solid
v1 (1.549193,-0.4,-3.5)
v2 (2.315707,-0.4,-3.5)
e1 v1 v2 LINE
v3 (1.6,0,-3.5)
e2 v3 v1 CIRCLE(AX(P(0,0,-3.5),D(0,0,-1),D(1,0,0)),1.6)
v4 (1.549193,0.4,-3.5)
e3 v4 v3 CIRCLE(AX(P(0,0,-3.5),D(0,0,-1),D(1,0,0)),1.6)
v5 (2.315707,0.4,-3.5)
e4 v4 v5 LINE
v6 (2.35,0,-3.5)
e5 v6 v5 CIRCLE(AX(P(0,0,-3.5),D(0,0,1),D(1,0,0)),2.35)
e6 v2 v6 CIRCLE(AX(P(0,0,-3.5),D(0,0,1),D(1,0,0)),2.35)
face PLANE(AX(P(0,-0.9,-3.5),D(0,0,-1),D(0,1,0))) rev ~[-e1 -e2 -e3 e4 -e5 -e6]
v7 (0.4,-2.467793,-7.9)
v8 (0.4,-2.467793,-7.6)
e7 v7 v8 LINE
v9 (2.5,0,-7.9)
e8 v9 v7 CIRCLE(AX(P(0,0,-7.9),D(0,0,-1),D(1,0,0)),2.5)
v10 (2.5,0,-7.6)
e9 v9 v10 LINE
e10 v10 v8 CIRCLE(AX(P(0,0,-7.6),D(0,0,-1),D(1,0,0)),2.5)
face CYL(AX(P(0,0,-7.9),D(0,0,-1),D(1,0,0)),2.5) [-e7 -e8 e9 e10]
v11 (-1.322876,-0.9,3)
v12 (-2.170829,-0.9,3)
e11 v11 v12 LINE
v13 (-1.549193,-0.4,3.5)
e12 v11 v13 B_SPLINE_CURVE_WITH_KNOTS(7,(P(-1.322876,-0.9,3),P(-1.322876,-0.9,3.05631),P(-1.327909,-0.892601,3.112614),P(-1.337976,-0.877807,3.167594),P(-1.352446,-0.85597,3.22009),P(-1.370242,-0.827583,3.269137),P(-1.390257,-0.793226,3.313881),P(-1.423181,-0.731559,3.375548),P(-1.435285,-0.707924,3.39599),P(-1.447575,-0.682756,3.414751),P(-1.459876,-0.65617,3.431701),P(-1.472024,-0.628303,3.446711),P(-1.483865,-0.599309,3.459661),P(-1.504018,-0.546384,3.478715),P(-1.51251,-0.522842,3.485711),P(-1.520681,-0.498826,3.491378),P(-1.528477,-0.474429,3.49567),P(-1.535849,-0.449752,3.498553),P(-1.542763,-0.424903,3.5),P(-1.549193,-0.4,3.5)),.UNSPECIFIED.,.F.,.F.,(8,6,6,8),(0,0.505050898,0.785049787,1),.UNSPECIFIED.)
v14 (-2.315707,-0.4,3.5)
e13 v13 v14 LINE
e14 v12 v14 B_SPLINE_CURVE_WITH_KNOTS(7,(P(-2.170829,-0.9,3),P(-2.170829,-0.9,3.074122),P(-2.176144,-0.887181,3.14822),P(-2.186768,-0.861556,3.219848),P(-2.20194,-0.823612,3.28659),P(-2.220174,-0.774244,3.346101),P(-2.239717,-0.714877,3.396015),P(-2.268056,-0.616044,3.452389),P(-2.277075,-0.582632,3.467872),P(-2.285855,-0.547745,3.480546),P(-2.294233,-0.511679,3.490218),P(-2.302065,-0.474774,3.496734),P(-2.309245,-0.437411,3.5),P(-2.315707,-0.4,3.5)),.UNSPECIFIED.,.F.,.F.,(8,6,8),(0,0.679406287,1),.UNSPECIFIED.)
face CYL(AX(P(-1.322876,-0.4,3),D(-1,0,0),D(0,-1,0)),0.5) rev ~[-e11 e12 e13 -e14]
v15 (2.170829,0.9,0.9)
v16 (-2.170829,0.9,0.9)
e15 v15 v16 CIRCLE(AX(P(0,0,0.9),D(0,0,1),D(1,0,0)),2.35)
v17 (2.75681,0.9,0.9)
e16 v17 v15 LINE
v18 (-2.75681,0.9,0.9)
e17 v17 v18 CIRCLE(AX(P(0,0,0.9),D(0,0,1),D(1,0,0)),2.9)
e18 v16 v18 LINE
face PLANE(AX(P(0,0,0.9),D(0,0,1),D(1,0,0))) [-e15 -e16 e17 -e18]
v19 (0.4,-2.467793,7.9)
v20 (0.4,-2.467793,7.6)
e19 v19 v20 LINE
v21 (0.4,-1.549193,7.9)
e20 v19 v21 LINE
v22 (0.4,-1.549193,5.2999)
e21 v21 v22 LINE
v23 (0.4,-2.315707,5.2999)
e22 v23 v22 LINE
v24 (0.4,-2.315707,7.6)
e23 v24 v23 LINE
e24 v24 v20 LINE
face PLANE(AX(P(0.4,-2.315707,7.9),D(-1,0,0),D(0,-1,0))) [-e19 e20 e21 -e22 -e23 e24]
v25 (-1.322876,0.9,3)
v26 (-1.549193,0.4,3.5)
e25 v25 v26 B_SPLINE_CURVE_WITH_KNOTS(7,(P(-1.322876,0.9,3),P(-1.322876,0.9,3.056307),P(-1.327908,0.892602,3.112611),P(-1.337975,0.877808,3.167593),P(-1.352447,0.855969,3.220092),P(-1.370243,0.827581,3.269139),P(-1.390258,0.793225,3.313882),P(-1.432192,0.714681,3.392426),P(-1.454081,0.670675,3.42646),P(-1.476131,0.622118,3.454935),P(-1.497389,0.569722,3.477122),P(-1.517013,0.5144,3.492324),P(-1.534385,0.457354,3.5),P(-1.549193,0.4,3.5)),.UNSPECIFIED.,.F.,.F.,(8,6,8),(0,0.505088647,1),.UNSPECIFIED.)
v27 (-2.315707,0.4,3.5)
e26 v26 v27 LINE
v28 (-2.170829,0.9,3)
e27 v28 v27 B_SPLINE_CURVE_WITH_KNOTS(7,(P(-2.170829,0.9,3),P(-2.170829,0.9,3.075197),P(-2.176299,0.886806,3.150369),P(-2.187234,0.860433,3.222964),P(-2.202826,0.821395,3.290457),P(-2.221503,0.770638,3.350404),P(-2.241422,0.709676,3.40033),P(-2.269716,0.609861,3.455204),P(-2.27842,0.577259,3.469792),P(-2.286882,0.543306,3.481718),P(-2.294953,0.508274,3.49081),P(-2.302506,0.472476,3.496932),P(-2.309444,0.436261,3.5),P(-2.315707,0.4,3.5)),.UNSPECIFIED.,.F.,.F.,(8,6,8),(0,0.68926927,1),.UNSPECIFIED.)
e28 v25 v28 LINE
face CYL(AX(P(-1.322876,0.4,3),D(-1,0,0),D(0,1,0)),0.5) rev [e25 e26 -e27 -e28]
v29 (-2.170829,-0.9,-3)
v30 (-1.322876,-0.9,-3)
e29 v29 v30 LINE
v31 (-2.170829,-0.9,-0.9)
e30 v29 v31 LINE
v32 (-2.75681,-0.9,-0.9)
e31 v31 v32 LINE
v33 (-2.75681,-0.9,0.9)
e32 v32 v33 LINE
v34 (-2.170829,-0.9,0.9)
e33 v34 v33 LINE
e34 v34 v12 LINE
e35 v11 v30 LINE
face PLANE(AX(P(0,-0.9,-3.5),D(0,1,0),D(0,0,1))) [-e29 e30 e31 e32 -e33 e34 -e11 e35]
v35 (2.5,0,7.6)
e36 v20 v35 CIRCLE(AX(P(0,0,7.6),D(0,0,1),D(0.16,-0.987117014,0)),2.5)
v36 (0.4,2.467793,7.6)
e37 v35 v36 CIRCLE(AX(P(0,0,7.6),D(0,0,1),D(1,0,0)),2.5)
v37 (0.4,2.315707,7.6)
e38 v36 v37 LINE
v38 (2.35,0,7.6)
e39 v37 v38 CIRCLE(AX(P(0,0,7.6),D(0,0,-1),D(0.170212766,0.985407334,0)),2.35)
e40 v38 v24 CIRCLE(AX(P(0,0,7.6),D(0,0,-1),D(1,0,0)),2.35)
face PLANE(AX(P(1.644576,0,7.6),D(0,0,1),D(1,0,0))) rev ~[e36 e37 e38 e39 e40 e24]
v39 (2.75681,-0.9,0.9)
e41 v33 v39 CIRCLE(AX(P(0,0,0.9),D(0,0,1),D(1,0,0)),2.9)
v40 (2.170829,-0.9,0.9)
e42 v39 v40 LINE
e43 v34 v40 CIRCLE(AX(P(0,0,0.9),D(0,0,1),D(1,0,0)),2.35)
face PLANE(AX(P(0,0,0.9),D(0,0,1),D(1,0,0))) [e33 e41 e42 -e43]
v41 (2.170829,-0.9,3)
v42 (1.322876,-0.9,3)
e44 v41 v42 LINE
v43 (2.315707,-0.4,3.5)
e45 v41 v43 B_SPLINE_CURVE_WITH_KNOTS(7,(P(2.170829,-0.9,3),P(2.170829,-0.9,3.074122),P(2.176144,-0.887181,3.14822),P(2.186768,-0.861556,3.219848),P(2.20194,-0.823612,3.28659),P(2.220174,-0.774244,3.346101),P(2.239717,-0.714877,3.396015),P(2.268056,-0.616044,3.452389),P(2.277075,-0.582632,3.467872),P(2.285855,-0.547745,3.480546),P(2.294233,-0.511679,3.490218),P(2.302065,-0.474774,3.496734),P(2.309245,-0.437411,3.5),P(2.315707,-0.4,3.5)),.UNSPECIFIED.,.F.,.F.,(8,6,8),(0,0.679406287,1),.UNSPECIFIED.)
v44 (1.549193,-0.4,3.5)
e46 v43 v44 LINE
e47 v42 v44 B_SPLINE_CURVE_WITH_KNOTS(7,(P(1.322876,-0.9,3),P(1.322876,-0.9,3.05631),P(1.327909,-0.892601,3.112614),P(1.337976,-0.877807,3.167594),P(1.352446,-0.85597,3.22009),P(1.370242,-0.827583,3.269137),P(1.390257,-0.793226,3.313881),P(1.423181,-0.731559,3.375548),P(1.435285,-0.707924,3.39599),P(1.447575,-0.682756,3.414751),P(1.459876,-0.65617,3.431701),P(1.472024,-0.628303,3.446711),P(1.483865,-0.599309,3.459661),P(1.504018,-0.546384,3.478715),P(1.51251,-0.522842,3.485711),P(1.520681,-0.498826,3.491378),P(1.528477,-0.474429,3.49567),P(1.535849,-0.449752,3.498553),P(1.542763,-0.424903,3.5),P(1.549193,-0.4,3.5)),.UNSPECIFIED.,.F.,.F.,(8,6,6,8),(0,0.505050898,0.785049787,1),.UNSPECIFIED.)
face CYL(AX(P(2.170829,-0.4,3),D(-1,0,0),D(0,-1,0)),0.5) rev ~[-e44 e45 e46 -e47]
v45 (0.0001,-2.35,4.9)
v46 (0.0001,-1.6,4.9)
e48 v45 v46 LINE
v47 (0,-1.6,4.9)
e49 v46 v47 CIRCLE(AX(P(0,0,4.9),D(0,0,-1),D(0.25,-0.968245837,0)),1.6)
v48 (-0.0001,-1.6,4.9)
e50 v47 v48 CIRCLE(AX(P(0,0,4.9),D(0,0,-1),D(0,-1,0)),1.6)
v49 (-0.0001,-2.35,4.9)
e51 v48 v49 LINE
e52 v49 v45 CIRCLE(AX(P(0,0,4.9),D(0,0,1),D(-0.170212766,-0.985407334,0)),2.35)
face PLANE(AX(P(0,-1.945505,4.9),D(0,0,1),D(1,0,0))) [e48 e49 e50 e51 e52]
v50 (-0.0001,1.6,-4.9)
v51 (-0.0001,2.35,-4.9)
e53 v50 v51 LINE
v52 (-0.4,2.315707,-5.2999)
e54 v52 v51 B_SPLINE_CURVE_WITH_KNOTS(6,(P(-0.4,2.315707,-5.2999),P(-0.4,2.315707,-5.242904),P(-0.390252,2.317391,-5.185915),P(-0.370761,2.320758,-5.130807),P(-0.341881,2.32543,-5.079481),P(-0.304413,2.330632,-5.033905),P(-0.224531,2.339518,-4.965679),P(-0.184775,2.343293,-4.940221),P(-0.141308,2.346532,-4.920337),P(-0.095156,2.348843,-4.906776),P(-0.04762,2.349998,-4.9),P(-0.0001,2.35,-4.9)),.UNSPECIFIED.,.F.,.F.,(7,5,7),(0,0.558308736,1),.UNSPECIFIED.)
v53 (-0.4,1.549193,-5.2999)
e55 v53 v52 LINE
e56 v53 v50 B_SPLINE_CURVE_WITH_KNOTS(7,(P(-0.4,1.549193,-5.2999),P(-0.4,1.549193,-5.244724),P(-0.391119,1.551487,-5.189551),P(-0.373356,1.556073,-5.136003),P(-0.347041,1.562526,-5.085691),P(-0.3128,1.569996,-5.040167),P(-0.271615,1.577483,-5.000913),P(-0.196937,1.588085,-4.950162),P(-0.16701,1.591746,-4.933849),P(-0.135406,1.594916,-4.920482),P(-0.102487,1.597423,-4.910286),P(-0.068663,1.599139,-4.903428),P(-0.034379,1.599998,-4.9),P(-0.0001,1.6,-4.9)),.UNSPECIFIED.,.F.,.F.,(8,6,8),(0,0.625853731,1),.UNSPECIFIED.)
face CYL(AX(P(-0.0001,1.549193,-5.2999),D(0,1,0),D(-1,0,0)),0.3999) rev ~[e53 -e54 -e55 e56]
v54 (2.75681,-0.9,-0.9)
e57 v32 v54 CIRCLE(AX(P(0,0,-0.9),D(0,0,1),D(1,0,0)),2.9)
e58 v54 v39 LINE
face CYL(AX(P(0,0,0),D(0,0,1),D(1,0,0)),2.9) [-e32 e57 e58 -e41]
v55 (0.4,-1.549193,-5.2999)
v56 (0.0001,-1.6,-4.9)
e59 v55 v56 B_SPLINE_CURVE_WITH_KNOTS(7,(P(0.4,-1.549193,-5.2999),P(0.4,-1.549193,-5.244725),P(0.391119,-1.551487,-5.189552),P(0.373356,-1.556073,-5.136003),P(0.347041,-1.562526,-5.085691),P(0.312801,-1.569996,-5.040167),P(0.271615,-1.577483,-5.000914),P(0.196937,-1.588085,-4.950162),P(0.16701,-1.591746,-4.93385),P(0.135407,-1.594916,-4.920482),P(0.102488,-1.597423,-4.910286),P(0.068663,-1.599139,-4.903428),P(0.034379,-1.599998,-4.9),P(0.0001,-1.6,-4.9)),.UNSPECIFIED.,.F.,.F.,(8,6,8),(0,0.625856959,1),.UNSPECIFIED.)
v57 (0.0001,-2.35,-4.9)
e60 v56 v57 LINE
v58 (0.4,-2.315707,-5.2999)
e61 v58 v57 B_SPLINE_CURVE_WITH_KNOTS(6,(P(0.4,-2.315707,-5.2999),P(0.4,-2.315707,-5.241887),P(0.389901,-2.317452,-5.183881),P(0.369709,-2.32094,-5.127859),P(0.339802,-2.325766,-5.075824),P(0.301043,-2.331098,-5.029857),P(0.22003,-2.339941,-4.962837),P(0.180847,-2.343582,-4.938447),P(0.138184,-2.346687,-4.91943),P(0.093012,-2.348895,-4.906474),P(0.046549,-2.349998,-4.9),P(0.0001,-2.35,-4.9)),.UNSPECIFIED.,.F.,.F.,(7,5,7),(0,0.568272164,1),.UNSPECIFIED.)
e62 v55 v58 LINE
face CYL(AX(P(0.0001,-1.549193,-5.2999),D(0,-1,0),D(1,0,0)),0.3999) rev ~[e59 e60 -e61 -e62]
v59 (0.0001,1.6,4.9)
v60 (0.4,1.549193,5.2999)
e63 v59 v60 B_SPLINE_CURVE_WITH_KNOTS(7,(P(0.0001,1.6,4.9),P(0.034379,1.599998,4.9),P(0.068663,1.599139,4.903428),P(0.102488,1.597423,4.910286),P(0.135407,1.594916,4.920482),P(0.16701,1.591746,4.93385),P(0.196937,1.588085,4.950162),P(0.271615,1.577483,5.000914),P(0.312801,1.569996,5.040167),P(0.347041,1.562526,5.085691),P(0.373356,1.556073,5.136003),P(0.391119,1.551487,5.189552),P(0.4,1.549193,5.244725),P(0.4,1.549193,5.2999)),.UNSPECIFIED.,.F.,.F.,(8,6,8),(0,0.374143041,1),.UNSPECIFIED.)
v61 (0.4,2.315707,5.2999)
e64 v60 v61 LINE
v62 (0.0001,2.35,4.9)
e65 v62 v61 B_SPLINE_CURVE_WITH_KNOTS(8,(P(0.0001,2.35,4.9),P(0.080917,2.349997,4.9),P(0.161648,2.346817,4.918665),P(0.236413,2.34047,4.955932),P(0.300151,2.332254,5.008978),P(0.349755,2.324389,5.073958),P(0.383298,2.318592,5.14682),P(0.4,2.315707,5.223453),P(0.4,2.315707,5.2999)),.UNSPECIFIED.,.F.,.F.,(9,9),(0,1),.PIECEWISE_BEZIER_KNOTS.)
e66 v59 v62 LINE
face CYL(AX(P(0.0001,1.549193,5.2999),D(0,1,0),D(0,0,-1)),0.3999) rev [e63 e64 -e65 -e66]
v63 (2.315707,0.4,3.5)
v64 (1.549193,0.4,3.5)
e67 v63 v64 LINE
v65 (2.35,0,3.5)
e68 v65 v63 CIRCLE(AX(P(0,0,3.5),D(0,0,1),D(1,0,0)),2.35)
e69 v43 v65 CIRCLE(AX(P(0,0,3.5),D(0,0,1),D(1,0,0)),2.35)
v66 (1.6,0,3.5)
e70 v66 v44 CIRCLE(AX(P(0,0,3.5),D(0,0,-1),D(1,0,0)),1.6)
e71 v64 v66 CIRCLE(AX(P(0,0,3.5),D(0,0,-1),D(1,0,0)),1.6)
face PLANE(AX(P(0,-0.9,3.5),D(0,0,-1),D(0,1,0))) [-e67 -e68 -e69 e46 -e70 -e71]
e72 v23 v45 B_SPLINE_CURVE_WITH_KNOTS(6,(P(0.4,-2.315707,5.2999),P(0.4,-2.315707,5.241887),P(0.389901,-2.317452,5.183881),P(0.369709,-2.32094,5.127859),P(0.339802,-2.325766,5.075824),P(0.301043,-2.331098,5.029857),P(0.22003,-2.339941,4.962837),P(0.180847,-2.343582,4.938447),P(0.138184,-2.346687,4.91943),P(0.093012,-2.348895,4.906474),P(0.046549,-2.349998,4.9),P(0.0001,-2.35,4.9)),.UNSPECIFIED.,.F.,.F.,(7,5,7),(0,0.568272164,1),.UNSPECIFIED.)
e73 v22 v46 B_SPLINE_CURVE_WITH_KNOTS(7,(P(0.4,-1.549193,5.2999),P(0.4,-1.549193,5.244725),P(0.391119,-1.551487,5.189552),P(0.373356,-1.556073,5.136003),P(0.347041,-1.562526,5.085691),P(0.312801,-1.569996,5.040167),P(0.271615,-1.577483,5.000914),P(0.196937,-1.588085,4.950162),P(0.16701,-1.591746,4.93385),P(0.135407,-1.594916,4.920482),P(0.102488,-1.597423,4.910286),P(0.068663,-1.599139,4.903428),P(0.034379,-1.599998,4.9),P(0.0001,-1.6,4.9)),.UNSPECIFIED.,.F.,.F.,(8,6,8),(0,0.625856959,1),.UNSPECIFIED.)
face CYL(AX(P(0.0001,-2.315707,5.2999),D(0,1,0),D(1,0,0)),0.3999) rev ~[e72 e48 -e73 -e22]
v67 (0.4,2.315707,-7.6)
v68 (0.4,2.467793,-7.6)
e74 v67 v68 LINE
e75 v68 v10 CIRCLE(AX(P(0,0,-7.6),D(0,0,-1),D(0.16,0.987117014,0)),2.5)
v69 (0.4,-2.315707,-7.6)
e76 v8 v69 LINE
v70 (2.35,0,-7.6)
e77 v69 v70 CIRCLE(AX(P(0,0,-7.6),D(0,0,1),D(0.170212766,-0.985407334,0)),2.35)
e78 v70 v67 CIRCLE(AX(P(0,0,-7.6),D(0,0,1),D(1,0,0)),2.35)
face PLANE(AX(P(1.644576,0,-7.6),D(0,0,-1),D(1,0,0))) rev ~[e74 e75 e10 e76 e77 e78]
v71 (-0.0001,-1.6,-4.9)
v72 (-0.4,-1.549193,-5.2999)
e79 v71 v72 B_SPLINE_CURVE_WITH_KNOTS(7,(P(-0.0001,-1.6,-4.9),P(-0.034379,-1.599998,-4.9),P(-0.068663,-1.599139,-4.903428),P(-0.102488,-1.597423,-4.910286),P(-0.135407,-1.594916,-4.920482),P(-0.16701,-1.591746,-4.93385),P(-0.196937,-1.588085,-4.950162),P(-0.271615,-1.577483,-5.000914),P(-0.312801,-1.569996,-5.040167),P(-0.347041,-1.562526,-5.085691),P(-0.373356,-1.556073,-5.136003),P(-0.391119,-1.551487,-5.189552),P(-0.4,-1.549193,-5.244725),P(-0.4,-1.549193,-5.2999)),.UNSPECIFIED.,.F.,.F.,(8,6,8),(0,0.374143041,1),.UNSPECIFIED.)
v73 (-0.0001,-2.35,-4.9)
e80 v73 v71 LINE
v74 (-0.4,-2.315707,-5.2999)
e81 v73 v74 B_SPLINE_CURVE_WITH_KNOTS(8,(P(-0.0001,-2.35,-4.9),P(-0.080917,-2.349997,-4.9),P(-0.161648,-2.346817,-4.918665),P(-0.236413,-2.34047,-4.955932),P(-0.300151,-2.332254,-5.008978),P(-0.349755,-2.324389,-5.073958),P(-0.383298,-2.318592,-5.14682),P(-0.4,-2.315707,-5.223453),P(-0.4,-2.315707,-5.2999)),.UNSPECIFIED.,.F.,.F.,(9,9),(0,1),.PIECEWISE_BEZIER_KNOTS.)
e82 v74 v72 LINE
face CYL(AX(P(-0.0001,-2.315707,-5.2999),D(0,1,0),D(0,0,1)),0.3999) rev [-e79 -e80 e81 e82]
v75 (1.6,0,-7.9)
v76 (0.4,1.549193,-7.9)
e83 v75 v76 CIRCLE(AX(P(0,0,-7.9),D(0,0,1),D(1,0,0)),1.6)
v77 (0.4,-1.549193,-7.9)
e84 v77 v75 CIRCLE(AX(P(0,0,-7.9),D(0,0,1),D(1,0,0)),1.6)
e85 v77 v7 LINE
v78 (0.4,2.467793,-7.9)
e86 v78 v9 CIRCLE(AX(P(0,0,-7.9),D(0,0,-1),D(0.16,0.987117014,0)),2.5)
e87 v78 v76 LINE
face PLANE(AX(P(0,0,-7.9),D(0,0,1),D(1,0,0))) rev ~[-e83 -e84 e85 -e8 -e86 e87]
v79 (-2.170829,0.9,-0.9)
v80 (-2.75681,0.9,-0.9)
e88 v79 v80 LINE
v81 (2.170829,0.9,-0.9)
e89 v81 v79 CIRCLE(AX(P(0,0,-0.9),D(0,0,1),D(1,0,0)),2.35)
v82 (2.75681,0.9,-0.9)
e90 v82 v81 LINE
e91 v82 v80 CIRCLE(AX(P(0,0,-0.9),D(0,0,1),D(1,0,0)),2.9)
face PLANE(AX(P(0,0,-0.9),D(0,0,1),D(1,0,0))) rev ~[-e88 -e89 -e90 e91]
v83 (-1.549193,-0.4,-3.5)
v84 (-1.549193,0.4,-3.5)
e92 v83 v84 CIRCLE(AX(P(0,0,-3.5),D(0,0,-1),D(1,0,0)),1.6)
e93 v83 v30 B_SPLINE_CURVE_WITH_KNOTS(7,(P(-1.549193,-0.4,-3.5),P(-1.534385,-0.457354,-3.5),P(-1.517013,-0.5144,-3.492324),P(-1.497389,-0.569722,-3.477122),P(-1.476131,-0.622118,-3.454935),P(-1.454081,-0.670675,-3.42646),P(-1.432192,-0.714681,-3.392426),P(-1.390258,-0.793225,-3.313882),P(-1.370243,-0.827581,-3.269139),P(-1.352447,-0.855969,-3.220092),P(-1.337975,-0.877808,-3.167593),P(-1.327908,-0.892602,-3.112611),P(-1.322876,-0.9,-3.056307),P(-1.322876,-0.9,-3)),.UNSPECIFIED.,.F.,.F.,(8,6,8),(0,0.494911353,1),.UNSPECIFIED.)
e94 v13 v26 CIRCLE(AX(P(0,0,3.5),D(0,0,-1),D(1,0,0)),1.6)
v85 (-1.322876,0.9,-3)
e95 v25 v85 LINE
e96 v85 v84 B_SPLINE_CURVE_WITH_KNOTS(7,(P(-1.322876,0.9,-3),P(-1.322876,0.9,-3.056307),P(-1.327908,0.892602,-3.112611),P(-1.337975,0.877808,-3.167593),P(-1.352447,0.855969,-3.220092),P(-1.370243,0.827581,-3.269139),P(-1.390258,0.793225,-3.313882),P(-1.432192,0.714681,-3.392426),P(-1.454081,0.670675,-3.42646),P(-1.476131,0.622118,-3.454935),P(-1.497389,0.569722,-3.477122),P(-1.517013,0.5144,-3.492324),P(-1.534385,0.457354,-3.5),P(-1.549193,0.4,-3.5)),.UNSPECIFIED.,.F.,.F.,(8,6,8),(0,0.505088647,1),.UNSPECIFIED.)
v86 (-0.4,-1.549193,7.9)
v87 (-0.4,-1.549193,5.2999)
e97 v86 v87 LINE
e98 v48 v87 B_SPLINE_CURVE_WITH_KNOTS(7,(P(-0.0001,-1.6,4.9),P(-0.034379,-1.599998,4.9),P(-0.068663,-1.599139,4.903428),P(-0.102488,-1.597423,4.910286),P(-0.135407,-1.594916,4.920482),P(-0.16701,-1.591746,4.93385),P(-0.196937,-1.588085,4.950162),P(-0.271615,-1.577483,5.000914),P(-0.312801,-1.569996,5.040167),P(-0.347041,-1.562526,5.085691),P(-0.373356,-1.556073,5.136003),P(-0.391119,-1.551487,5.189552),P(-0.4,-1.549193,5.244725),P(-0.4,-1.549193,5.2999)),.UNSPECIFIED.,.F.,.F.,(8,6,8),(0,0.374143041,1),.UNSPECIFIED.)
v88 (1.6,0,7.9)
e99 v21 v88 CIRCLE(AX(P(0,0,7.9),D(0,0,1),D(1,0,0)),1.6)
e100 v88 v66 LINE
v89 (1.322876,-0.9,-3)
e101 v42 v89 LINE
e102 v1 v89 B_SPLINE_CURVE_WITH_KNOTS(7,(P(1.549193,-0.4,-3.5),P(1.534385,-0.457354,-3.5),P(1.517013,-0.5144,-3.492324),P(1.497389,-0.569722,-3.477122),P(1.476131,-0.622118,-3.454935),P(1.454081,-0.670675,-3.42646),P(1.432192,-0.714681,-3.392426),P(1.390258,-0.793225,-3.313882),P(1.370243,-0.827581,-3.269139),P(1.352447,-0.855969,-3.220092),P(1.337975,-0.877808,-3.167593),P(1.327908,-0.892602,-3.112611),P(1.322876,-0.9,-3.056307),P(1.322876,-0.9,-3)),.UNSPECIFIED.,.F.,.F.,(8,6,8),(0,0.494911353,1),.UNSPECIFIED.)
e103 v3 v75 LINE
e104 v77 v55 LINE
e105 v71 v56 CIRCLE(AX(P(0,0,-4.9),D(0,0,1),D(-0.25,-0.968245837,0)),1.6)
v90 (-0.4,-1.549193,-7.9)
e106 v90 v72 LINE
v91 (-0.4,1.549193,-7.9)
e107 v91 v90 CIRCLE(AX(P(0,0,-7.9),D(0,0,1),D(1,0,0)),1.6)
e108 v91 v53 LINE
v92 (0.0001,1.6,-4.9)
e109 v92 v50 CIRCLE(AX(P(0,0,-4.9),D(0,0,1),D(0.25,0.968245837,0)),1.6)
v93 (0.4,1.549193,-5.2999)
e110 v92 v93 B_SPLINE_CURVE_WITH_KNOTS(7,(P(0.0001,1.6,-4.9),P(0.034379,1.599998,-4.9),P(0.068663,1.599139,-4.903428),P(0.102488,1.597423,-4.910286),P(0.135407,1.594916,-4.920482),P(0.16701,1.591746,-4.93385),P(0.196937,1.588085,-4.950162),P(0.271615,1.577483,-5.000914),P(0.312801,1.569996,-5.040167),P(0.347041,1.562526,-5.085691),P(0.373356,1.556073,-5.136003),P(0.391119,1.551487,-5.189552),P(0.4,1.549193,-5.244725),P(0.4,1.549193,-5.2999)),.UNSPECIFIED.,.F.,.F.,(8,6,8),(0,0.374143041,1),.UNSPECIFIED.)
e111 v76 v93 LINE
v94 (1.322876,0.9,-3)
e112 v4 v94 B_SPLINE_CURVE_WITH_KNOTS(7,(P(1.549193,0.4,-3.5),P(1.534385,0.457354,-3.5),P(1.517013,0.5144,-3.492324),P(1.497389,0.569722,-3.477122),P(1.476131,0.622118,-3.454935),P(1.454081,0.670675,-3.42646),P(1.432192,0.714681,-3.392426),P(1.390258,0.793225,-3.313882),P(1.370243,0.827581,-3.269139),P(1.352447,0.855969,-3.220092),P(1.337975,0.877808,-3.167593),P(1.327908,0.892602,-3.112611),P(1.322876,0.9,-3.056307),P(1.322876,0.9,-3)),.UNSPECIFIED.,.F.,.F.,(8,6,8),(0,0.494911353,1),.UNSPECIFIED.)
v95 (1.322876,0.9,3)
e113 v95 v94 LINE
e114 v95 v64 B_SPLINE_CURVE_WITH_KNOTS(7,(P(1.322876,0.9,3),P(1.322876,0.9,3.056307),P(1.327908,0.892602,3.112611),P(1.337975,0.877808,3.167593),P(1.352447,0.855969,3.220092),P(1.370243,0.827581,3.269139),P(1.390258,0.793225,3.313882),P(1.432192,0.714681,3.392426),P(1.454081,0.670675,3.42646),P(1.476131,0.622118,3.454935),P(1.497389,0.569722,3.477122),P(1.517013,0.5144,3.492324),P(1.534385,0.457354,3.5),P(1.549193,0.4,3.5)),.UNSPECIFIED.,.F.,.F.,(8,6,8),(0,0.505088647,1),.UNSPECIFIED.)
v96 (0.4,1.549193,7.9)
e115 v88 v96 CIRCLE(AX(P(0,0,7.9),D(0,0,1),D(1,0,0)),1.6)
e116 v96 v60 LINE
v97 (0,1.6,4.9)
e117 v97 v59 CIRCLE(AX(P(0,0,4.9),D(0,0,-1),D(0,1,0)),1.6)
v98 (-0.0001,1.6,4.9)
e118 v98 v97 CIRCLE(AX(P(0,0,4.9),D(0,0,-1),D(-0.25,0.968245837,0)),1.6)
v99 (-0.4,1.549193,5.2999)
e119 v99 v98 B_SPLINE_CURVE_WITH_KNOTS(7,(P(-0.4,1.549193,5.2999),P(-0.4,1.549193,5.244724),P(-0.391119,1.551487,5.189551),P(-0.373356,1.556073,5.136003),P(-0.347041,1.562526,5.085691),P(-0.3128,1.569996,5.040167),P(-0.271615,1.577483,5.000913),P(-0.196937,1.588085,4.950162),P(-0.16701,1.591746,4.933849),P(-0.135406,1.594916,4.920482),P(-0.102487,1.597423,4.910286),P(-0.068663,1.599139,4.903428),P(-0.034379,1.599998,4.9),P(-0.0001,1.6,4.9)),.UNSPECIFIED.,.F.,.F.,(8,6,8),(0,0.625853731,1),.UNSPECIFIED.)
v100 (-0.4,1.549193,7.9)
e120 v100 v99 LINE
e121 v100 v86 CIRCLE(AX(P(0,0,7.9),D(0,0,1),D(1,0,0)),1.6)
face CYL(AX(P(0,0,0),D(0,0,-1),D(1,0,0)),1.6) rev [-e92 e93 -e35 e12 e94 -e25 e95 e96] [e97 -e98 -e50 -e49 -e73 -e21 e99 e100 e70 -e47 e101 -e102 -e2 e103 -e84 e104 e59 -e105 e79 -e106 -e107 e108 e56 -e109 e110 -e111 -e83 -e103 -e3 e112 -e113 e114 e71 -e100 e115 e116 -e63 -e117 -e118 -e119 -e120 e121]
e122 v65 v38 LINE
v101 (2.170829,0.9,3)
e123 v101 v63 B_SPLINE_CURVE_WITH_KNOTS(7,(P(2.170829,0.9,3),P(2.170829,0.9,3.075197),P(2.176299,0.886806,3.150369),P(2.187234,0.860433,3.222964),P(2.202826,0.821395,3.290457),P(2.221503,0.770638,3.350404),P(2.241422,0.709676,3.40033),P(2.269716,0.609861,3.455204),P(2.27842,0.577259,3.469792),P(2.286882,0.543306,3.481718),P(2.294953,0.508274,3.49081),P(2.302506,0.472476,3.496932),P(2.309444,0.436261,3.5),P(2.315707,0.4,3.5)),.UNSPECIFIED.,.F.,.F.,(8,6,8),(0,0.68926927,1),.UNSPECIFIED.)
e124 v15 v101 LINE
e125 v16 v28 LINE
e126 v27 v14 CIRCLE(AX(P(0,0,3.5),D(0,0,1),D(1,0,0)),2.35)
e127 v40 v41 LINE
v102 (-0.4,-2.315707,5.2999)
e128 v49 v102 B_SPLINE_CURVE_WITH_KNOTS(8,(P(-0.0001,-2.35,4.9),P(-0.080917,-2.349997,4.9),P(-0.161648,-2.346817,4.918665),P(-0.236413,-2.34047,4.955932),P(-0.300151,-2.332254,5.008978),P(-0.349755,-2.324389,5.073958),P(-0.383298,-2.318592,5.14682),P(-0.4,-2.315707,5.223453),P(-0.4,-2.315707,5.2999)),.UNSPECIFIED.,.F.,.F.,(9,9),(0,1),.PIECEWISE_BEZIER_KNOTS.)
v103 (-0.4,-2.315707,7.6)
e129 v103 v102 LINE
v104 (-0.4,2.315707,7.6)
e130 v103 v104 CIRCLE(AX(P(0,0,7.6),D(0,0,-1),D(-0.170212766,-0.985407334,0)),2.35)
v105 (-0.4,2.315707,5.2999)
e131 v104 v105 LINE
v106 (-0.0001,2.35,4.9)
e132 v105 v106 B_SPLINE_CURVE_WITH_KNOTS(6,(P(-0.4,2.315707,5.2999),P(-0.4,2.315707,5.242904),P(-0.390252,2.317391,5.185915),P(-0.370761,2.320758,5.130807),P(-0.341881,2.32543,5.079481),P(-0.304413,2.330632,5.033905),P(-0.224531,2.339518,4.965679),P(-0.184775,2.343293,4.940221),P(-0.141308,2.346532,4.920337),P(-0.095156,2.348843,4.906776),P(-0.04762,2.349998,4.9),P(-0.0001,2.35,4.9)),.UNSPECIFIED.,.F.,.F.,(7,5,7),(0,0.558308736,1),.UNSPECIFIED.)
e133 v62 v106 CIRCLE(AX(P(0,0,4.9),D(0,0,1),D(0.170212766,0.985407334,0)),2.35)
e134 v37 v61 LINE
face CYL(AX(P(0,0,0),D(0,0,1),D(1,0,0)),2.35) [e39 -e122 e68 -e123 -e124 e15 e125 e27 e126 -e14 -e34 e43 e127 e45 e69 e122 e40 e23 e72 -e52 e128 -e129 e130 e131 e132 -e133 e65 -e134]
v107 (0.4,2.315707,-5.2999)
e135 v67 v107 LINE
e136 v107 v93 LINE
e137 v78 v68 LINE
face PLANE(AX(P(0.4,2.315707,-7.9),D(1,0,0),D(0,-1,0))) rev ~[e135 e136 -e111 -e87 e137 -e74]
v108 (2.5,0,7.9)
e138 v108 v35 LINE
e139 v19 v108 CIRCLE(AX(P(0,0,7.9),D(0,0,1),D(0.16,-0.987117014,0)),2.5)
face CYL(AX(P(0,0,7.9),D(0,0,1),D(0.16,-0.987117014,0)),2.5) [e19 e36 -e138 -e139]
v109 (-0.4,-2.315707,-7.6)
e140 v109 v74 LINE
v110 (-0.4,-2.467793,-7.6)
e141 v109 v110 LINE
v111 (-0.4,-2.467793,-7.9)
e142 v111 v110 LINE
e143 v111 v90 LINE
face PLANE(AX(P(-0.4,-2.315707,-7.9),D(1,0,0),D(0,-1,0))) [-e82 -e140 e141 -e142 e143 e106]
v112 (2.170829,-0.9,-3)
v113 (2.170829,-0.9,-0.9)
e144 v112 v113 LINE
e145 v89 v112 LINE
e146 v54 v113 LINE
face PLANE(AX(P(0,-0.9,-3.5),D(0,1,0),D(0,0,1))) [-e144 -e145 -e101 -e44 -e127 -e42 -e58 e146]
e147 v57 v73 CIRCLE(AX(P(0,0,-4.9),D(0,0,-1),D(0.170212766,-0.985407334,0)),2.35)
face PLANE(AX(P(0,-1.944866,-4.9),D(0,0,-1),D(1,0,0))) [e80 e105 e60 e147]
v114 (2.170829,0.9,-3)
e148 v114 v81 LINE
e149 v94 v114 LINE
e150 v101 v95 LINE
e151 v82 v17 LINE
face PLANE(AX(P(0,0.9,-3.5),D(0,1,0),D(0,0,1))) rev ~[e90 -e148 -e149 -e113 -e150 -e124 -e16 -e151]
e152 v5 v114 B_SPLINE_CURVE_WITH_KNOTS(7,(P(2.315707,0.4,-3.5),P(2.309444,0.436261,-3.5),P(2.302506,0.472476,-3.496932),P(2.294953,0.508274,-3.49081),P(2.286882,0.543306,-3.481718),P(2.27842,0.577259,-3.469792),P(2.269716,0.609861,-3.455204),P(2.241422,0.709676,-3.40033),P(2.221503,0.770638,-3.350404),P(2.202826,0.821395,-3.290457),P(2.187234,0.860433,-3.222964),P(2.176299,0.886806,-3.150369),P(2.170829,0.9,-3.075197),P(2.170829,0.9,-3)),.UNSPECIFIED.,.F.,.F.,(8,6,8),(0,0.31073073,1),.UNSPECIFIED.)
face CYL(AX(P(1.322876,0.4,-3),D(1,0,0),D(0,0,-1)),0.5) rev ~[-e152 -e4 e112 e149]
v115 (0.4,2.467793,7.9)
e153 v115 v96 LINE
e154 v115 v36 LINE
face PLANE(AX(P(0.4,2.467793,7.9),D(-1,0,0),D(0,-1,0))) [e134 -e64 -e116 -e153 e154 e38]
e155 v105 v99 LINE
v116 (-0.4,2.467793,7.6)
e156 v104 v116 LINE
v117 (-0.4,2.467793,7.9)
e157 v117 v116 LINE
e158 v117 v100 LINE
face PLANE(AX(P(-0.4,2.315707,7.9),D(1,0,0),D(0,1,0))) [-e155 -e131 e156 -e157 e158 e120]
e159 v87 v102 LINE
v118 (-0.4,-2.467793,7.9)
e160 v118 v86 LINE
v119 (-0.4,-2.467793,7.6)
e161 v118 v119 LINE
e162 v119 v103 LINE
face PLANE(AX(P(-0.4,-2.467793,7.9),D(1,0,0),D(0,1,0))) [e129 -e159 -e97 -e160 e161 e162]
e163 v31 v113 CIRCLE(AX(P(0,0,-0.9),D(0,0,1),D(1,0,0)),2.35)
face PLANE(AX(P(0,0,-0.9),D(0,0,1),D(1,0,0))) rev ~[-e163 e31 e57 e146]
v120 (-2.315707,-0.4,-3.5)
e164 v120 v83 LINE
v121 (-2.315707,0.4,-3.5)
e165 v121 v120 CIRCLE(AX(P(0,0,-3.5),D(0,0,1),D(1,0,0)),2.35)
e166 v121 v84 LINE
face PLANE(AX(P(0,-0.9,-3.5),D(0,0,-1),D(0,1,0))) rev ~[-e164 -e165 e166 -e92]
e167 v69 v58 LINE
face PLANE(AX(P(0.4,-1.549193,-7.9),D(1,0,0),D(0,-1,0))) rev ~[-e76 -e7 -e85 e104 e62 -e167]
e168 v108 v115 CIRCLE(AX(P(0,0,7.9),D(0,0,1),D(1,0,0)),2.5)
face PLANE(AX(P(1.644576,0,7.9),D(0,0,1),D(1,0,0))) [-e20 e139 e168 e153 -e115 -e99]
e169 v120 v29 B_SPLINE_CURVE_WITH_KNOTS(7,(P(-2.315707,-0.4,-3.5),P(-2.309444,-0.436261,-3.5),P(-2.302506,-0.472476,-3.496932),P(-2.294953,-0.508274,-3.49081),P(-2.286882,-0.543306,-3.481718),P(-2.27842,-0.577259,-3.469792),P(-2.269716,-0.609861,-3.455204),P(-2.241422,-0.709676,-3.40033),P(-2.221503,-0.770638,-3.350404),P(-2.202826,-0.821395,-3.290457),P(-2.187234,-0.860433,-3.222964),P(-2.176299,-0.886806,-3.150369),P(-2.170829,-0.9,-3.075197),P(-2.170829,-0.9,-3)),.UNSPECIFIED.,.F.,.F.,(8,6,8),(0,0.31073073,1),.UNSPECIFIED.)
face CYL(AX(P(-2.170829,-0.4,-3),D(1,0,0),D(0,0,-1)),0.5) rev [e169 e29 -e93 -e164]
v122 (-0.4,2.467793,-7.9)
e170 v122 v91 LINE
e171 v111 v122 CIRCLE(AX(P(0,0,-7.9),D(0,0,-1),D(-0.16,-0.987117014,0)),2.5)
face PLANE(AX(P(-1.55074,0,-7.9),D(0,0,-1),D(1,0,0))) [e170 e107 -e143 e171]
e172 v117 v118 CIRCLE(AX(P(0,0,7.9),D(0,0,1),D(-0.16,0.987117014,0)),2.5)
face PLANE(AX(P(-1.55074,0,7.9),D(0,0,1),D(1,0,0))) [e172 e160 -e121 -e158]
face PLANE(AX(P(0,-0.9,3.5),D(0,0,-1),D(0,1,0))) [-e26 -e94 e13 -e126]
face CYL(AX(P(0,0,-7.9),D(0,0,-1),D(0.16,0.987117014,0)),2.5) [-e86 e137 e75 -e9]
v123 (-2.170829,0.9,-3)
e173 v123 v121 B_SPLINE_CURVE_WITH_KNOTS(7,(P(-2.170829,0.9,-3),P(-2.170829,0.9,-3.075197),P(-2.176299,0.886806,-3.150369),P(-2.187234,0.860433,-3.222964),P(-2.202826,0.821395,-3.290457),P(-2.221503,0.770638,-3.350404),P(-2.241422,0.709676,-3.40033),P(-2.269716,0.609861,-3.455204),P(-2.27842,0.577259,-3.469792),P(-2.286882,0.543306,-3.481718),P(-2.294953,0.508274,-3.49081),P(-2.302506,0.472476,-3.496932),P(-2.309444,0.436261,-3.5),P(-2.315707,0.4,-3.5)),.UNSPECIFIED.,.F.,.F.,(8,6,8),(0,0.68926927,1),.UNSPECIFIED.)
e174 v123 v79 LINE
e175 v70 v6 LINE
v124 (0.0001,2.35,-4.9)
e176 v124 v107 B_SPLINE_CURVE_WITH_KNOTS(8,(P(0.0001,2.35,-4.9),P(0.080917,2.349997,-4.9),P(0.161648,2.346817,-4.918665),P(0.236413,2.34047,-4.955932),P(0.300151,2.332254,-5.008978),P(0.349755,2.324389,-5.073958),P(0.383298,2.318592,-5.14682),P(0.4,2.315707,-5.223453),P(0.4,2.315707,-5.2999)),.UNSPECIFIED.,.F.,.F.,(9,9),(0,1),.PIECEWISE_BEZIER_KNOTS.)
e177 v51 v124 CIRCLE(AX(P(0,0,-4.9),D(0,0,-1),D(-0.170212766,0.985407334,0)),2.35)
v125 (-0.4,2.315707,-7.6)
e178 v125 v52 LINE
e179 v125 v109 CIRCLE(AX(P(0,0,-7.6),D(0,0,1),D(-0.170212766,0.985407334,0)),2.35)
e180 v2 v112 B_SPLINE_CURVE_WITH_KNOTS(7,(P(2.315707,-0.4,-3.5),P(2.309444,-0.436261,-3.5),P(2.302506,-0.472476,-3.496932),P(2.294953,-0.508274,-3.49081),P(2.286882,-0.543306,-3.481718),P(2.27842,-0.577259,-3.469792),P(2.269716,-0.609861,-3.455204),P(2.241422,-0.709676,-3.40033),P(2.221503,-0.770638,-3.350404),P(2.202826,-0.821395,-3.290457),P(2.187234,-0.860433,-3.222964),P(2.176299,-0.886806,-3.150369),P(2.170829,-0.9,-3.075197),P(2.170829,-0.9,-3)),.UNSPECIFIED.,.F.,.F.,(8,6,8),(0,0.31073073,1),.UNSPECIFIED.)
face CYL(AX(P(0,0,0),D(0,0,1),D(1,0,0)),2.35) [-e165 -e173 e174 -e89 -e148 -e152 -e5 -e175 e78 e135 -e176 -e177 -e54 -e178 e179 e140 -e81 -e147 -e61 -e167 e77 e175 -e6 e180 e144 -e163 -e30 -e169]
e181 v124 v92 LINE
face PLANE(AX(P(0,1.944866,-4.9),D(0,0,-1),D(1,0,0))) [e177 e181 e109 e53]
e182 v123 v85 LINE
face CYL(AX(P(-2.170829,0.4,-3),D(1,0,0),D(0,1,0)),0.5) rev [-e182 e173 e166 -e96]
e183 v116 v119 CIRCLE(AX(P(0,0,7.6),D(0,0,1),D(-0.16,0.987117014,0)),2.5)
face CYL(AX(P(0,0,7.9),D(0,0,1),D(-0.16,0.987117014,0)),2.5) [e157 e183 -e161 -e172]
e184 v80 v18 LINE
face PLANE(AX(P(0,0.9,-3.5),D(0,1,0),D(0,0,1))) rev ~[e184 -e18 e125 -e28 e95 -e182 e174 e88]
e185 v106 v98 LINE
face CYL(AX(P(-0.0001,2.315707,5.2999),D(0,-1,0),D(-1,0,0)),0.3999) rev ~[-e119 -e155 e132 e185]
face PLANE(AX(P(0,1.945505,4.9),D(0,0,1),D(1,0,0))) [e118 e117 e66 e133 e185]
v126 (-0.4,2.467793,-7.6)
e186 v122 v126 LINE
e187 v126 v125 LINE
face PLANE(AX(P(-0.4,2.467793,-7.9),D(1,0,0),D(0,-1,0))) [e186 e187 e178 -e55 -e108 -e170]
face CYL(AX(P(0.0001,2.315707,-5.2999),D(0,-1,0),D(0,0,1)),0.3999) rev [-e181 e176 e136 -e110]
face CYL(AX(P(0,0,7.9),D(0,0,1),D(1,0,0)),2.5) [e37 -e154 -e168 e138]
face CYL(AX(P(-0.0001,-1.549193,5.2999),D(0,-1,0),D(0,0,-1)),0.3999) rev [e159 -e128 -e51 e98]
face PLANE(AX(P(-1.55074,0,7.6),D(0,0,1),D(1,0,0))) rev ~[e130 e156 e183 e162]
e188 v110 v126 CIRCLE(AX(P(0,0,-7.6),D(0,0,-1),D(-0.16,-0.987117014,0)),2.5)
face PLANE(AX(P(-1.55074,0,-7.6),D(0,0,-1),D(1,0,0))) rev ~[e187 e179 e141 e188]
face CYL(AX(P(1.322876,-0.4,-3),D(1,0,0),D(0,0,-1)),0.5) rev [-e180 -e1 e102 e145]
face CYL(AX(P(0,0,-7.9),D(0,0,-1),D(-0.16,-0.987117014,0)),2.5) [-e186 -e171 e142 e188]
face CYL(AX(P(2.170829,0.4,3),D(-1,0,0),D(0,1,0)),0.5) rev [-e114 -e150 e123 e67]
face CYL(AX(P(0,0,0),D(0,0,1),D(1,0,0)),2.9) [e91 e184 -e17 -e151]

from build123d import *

# Parameters (mm, degrees)
F0_R      = 2.35
F0_R_2    = 1.6
F1_DEPTH  = 7.9
F3_DEPTH  = 3
F0_R_3    = 2.9
F4_DEPTH  = 0.9
F5_W      = 1.8
F5_H      = 7
F6_DEPTH  = 12.5
F7_R      = 0.5
F9_DEPTH  = 3
F10_R     = 0.3999
F12_DEPTH = 0.3
F14_DEPTH = 0.3
F16_DEPTH = 0.3


# Not quite as in the source:
# - a fillet or chamfer is up to 0.001 mm smaller than in the source, because OpenCascade refuses the exact size


with BuildPart() as f1:
    # F0 (on Top) → F1 (new body, symmetric)
    with BuildSketch(Plane.XY):
        Circle(F0_R)
        Circle(F0_R_2, mode=Mode.SUBTRACT)
    extrude(amount=F1_DEPTH, both=True)

    # F2 (on face) → F3 (cut)
    with BuildSketch(Plane.XY.offset(7.9)):
        with BuildLine():
            ThreePointArc((-0.4, 1.5491933385), (-0.201606868, 1.587247514), (0, 1.6))
            ThreePointArc((0, 1.6), (0.201606868, 1.587247514), (0.4, 1.5491933385))
            Line((0.4, 1.5491933385), (0.4, 1.6))
            Line((0.4, 1.6), (0.4, 2.3157072354))
            ThreePointArc((0.4, 2.3157072354), (0, 2.35), (-0.4, 2.3157072354))
            Line((-0.4, 2.3157072354), (-0.4, 1.6))
            Line((-0.4, 1.6), (-0.4, 1.5491933385))
        make_face()
        with BuildLine():
            ThreePointArc((0.4, -1.5491933385), (0.201606868, -1.587247514), (0, -1.6))
            ThreePointArc((0, -1.6), (-0.201606868, -1.587247514), (-0.4, -1.5491933385))
            Line((-0.4, -1.5491933385), (-0.4, -1.6))
            Line((-0.4, -1.6), (-0.4, -2.3157072354))
            ThreePointArc((-0.4, -2.3157072354), (0, -2.35), (0.4, -2.3157072354))
            Line((0.4, -2.3157072354), (0.4, -1.6))
            Line((0.4, -1.6), (0.4, -1.5491933385))
        make_face()
    extrude(amount=-F3_DEPTH, mode=Mode.SUBTRACT)

    # F0 (on Top) → F4 (join, symmetric)
    with BuildSketch(Plane.XY):
        Circle(F0_R_3)
        Circle(F0_R, mode=Mode.SUBTRACT)
    extrude(amount=F4_DEPTH, both=True)

    # F5 (on Right) → F6 (cut, symmetric)
    with BuildSketch(Plane.YZ):
        Rectangle(F5_W, F5_H)
    extrude(amount=F6_DEPTH, both=True, mode=Mode.SUBTRACT)

    # F7
    f7_edges = [f1.edges().sort_by_distance(p)[0] for p in [
        (-1.746852, -0.9, 3.5),
        (1.746852, -0.9, 3.5),
        (1.746852, 0.9, 3.5),
        (-1.746852, 0.9, 3.5),
        (1.746852, -0.9, -3.5),
        (-1.746852, -0.9, -3.5),
        (1.746852, 0.9, -3.5),
        (-1.746852, 0.9, -3.5),
    ]]
    fillet(f7_edges, radius=F7_R)

    # F8 (on face) → F9 (cut)
    with BuildSketch(Plane(origin=(0, 0, -7.9), x_dir=(1, 0, 0), z_dir=(0, 0, -1))):
        with BuildLine():
            Line((0.4, 1.5491933385), (0.4, 1.6))
            Line((0.4, 1.6), (0.4, 2.3157072354))
            ThreePointArc((0.4, 2.3157072354), (0, 2.35), (-0.4, 2.3157072354))
            Line((-0.4, 2.3157072354), (-0.4, 1.6))
            Line((-0.4, 1.6), (-0.4, 1.5491933385))
            ThreePointArc((-0.4, 1.5491933385), (0, 1.6), (0.4, 1.5491933385))
        make_face()
        with BuildLine():
            ThreePointArc((-0.4, -2.3157072354), (0, -2.35), (0.4, -2.3157072354))
            Line((0.4, -2.3157072354), (0.4, -1.6))
            Line((0.4, -1.6), (0.4, -1.5491933385))
            ThreePointArc((0.4, -1.5491933385), (0, -1.6), (-0.4, -1.5491933385))
            Line((-0.4, -1.5491933385), (-0.4, -1.6))
            Line((-0.4, -1.6), (-0.4, -2.3157072354))
        make_face()
    extrude(amount=-F9_DEPTH, mode=Mode.SUBTRACT)

    # F10 (radius 0.4 in the source; OpenCascade refuses exactly that, so slightly less here)
    f10_edges = [f1.edges().sort_by_distance(p)[0] for p in [
        (0.4, -1.93245, -4.9),
        (-0.4, -1.93245, -4.9),
        (-0.4, 1.93245, -4.9),
        (0.4, 1.93245, -4.9),
        (0.4, 1.93245, 4.9),
        (-0.4, 1.93245, 4.9),
        (-0.4, -1.93245, 4.9),
        (0.4, -1.93245, 4.9),
    ]]
    fillet(f10_edges, radius=F10_R)

    # F11 (on face) → F12 (join)
    with BuildSketch(Plane(origin=(0, 0, -7.9), x_dir=(1, 0, 0), z_dir=(0, 0, -1))):
        with BuildLine():
            Line((-0.4, 2.3157072354), (-0.4, 2.4677925359))
            ThreePointArc((-0.4, 2.4677925359), (-2.5, 0), (-0.4, -2.4677925359))
            Line((-0.4, -2.4677925359), (-0.4, -2.3157072354))
            ThreePointArc((-0.4, -2.3157072354), (-2.35, 0), (-0.4, 2.3157072354))
        make_face()
        with BuildLine():
            ThreePointArc((0.4, -2.4677925359), (1.9039432765, -1.6201851746), (2.5, 0))
            ThreePointArc((2.5, 0), (1.9039432765, 1.6201851746), (0.4, 2.4677925359))
            Line((0.4, 2.4677925359), (0.4, 2.3157072354))
            ThreePointArc((0.4, 2.3157072354), (1.7975678012, 1.5136875503), (2.35, 0))
            ThreePointArc((2.35, 0), (1.7975678012, -1.5136875503), (0.4, -2.3157072354))
            Line((0.4, -2.3157072354), (0.4, -2.4677925359))
        make_face()
    extrude(amount=-F12_DEPTH)

    # F13 (on face) → F14 (join)
    with BuildSketch(Plane.XY.offset(7.9)):
        with BuildLine():
            Line((-0.4, 2.3157072354), (-0.4, 2.4677925359))
            ThreePointArc((-0.4, 2.4677925359), (-2.5, 0), (-0.4, -2.4677925359))
            Line((-0.4, -2.4677925359), (-0.4, -2.3157072354))
            ThreePointArc((-0.4, -2.3157072354), (-2.35, 0), (-0.4, 2.3157072354))
        make_face()
    extrude(amount=-F14_DEPTH)

    # F15 (on face) → F16 (join)
    with BuildSketch(Plane.XY.offset(7.9)):
        with BuildLine():
            ThreePointArc((0.4, -2.4677925359), (1.9039432765, -1.6201851746), (2.5, 0))
            ThreePointArc((2.5, 0), (1.9039432765, 1.6201851746), (0.4, 2.4677925359))
            Line((0.4, 2.4677925359), (0.4, 2.3157072354))
            ThreePointArc((0.4, 2.3157072354), (1.7975678012, 1.5136875503), (2.35, 0))
            ThreePointArc((2.35, 0), (1.7975678012, -1.5136875503), (0.4, -2.3157072354))
            Line((0.4, -2.3157072354), (0.4, -2.4677925359))
        make_face()
    extrude(amount=-F16_DEPTH)


solid = f1.part
